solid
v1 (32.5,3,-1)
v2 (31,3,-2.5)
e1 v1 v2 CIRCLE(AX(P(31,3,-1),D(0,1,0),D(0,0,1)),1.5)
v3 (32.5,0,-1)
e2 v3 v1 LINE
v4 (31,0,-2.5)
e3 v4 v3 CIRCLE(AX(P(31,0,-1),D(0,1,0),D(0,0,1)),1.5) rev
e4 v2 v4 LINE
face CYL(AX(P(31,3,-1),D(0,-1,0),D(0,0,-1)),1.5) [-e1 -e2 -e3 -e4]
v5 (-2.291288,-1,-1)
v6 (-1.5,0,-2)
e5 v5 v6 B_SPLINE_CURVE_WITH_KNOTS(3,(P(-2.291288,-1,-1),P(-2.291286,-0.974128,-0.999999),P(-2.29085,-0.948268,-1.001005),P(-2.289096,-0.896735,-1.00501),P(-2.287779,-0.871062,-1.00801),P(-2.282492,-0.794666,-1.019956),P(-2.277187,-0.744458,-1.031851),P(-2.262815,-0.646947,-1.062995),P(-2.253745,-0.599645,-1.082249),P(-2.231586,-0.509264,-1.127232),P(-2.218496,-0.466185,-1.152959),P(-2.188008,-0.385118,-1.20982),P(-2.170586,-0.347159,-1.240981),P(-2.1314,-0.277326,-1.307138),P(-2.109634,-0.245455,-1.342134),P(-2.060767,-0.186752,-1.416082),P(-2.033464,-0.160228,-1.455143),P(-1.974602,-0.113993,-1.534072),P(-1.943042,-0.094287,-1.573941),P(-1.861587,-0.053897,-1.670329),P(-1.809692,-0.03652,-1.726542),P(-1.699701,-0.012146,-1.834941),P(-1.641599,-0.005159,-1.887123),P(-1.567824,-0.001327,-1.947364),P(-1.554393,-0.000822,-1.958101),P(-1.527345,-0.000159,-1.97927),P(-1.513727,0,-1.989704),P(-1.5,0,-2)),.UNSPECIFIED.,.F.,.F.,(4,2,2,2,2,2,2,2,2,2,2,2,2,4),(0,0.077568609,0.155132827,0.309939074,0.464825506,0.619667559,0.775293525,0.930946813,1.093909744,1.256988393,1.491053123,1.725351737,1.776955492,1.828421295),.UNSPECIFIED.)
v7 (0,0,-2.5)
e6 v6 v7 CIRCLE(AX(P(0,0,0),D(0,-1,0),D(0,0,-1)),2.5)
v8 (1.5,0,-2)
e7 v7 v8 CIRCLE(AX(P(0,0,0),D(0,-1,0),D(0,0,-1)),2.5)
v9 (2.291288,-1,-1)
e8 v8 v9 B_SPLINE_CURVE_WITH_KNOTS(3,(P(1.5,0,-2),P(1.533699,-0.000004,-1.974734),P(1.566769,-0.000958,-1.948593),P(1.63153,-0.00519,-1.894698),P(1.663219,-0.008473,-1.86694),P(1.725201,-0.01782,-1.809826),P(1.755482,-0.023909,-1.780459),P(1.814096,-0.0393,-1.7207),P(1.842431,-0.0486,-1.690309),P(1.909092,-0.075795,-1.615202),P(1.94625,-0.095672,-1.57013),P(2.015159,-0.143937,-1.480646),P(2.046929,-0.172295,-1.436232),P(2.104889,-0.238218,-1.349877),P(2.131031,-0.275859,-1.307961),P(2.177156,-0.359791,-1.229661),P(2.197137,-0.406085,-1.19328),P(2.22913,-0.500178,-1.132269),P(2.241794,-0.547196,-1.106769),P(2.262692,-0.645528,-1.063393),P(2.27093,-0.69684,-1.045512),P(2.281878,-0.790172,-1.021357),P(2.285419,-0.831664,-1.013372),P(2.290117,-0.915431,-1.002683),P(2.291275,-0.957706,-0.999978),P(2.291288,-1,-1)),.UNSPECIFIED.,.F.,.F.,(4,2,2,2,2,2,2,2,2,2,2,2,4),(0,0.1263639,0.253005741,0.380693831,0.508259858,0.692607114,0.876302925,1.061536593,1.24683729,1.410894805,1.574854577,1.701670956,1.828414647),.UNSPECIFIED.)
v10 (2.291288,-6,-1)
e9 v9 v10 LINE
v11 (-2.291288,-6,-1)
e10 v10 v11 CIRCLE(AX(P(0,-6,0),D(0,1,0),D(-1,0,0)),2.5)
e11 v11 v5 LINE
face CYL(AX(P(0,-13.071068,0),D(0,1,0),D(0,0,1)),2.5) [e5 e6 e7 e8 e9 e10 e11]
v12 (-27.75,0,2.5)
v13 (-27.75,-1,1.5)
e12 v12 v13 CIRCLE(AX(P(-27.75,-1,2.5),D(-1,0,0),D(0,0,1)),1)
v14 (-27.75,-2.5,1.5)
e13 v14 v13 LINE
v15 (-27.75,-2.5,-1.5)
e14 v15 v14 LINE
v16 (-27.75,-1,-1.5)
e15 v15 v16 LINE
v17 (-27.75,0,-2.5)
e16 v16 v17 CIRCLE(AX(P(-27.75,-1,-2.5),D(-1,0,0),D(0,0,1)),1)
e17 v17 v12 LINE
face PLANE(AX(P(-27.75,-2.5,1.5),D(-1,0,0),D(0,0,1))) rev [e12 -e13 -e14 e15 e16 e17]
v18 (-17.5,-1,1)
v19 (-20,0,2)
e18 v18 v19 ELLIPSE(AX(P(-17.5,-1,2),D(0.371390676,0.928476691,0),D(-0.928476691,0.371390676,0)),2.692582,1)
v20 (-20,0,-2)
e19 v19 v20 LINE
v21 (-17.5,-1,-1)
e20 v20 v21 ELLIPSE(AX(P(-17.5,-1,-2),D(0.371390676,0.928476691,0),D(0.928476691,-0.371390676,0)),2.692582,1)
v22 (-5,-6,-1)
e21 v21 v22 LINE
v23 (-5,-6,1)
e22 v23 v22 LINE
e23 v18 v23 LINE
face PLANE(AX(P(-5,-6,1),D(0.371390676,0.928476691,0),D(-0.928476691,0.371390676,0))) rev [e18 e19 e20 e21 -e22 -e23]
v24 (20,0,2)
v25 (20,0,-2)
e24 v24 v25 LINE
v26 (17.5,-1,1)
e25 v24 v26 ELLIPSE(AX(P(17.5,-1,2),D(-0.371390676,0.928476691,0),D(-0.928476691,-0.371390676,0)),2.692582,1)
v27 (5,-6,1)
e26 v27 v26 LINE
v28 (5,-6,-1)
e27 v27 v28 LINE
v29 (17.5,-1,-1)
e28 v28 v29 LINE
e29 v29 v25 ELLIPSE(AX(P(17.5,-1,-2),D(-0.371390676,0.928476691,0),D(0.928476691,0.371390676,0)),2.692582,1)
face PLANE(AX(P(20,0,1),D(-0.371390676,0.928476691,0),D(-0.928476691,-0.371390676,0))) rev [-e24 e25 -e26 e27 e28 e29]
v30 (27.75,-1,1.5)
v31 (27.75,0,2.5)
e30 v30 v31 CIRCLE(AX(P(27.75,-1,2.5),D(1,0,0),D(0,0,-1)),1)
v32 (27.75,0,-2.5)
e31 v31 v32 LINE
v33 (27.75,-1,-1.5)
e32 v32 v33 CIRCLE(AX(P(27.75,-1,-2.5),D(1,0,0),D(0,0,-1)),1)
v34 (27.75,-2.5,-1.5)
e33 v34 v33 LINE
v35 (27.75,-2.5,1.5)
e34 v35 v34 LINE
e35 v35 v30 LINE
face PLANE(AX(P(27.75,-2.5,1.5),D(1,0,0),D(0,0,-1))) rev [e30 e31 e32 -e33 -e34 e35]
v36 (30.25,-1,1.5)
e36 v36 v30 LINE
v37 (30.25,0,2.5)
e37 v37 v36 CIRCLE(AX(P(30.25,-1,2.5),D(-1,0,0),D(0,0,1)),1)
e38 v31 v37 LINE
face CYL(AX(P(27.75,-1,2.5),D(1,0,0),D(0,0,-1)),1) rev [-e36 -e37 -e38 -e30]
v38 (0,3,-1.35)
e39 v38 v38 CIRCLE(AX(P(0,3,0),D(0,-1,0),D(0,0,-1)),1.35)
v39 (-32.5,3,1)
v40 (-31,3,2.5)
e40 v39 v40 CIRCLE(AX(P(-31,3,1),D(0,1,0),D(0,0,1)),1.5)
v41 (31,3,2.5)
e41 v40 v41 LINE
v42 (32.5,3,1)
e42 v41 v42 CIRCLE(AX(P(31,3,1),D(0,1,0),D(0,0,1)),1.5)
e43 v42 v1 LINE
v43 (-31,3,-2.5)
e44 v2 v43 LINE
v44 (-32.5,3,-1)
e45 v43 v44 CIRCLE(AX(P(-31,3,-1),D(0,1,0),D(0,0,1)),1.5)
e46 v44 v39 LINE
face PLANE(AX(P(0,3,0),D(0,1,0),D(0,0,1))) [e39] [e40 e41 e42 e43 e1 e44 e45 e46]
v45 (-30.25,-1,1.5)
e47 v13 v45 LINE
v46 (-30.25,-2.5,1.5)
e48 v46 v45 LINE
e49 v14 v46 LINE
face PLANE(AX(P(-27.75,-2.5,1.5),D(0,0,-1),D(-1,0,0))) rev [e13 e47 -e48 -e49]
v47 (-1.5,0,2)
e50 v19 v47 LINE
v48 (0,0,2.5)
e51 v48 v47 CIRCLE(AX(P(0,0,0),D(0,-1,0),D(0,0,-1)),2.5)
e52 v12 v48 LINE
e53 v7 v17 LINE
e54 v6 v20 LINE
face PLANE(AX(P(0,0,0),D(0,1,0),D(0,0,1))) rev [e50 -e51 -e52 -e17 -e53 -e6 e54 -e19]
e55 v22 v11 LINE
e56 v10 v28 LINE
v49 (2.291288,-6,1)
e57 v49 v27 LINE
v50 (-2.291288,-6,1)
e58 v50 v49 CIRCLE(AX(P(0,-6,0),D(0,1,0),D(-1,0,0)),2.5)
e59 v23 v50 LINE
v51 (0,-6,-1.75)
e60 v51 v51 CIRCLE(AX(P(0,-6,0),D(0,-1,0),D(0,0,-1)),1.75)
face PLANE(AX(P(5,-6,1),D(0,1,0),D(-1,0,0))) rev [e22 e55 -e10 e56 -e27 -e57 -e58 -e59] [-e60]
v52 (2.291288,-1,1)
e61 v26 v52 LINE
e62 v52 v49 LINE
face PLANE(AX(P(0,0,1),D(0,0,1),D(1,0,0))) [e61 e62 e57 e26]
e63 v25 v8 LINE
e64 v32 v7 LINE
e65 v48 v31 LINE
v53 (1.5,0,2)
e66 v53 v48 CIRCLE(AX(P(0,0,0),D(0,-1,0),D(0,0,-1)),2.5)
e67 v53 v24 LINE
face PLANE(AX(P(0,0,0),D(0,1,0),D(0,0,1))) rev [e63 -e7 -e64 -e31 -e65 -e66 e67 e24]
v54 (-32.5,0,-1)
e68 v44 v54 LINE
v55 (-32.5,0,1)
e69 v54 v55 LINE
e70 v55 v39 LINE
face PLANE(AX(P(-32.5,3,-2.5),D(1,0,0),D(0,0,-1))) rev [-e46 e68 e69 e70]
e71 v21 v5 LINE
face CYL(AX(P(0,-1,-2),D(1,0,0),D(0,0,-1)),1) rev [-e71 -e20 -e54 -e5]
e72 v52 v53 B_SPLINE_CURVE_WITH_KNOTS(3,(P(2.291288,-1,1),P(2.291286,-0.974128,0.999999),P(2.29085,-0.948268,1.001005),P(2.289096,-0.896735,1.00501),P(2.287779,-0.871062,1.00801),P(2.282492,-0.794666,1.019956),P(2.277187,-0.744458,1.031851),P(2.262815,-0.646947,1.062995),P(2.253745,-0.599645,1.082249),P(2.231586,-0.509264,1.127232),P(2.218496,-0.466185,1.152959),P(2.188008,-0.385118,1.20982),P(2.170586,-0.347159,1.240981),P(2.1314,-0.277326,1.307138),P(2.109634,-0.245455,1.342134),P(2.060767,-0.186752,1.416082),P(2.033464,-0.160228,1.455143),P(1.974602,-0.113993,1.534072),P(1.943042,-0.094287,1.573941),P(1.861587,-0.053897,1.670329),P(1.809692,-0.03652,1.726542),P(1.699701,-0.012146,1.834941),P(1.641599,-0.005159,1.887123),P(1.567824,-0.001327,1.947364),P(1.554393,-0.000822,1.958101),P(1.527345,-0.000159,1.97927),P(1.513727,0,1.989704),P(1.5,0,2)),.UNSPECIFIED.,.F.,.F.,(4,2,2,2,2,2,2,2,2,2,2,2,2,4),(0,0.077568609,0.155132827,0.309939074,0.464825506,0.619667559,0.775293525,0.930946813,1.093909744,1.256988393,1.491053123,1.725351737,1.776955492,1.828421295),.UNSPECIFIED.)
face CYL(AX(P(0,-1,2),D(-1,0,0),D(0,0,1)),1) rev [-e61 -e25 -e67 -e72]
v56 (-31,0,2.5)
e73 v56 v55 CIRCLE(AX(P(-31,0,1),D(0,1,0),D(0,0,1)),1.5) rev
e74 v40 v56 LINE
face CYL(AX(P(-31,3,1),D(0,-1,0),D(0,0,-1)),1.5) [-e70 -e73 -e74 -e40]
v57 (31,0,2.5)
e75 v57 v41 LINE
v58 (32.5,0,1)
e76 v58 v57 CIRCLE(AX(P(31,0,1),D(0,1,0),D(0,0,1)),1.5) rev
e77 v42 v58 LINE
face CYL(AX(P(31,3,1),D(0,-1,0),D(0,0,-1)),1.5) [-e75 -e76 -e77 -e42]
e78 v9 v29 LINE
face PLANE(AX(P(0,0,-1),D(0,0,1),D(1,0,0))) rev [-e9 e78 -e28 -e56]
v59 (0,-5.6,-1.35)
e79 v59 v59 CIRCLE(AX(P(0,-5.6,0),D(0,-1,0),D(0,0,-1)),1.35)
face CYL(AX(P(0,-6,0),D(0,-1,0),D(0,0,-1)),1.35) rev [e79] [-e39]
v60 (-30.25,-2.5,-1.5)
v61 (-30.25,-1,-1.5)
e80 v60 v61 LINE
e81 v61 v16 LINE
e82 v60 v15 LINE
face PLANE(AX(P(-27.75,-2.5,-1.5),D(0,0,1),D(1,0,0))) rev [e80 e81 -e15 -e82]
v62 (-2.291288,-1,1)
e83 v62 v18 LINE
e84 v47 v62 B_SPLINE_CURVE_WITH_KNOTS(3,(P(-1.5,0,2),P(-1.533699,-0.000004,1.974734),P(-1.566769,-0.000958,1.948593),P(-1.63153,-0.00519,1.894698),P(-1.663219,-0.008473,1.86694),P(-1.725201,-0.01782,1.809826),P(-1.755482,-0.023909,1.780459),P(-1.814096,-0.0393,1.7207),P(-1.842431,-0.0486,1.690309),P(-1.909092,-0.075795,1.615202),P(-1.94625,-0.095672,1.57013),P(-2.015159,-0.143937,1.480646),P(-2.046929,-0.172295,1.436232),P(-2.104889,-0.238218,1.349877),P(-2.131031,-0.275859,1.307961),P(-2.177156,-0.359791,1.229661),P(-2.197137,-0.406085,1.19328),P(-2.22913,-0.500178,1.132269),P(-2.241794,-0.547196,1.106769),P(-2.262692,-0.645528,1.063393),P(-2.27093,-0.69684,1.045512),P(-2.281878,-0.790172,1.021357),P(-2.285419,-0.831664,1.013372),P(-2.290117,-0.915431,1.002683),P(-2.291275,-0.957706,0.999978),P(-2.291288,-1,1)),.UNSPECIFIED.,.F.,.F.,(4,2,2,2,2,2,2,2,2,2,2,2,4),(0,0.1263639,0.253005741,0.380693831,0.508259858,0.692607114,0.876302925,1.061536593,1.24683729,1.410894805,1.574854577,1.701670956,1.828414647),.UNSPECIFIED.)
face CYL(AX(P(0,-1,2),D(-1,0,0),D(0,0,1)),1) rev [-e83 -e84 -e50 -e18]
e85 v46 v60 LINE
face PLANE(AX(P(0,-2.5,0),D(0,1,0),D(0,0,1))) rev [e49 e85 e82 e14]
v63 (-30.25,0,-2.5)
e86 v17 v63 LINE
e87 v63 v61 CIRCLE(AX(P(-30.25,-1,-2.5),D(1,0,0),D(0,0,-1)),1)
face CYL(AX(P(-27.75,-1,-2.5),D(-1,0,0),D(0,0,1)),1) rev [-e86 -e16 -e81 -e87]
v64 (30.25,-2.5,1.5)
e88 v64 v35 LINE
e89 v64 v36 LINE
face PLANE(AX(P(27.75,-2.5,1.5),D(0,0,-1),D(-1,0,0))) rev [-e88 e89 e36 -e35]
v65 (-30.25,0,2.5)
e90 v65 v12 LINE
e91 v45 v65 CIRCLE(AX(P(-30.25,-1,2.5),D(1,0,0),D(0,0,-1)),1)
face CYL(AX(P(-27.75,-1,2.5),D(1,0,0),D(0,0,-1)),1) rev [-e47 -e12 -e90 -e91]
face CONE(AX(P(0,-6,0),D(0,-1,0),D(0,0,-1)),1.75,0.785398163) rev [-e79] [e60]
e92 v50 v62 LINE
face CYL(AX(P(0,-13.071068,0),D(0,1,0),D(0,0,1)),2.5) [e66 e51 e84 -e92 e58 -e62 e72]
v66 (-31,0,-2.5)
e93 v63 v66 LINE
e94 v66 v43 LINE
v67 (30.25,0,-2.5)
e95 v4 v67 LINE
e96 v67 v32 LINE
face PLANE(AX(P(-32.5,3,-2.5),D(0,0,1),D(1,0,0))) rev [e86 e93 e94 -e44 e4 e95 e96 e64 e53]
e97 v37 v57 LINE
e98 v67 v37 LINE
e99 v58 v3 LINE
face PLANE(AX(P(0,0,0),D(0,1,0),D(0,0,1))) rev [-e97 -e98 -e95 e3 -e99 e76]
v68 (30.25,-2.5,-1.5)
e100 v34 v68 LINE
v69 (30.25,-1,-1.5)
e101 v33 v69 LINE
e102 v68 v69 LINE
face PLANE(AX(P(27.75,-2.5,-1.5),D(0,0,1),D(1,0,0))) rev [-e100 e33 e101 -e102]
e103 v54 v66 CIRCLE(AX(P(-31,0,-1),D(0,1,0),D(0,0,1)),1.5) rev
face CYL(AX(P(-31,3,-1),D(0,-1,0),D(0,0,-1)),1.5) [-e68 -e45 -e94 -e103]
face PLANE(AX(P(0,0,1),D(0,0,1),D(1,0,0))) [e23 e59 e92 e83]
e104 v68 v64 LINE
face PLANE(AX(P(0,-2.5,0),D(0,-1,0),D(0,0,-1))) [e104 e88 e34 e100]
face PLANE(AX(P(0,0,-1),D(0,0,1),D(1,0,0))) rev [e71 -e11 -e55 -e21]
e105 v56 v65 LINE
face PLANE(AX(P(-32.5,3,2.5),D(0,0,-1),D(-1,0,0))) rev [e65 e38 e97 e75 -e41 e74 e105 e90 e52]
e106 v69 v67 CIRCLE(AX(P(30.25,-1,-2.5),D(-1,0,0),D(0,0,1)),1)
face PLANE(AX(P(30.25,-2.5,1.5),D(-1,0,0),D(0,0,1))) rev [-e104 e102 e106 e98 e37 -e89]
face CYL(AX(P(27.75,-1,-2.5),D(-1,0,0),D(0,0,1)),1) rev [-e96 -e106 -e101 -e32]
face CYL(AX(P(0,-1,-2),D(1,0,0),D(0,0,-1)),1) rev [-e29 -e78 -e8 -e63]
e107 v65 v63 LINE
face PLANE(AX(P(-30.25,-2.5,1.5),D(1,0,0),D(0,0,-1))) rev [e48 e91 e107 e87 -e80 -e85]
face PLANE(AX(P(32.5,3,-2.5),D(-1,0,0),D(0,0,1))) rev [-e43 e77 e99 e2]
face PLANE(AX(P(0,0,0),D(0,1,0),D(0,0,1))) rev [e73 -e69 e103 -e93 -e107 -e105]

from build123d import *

# Parameters (mm, degrees)
SKETCH1_W                        = 65
SKETCH1_H                        = 5
BODY_DEPTH                       = 3
SKETCH3_W                        = 2.5
SKETCH3_H                        = 3
PEGS_DEPTH                       = 2.5
WEB_DEPTH                        = 1
SKETCH6_R                        = 2.5
HOLE_BOSS_DEPTH                  = 6
M2_5_CLEARANCE_HOLE1_D           = 2.7
M2_5_CLEARANCE_HOLE1_CSINK_D     = 3.5
M2_5_CLEARANCE_HOLE1_CSINK_ANGLE = 90
FILLET1_R                        = 1.5
FILLET2_R                        = 1
FILLET3_R                        = 1


with BuildPart() as part:
    # Sketch1 → body (new body)
    with BuildSketch(Plane(origin=(0, 0, 0), x_dir=(1, 0, 0), z_dir=(0, 1, 0))):
        Rectangle(SKETCH1_W, SKETCH1_H)
    extrude(amount=BODY_DEPTH)

    # Sketch3 → pegs (add)
    with BuildSketch(Plane.XZ):
        with Locations((29, 0)):
            Rectangle(SKETCH3_W, SKETCH3_H)
        with Locations((-29, 0)):
            Rectangle(SKETCH3_W, SKETCH3_H)
    extrude(amount=PEGS_DEPTH)

    # Sketch5 → web (add, symmetric)
    with BuildSketch(Plane.XY):
        Polygon((-20, 0), (20, 0), (5, -6), (-5, -6), align=None)
    extrude(amount=WEB_DEPTH, both=True)

    # Sketch6 → hole-boss (add)
    with BuildSketch(Plane.XZ):
        Circle(SKETCH6_R)
    extrude(amount=HOLE_BOSS_DEPTH)

    # M2.5 Clearance Hole1 (through all)
    with Locations(Plane(origin=(0, -6, 0), x_dir=(-1, 0, 0), z_dir=(0, -1, 0))):
        with Locations((0, 0)):
            CounterSinkHole(M2_5_CLEARANCE_HOLE1_D / 2, M2_5_CLEARANCE_HOLE1_CSINK_D / 2, counter_sink_angle=M2_5_CLEARANCE_HOLE1_CSINK_ANGLE)

    # Fillet1
    fillet1_edges = [part.edges().sort_by_distance(p)[0] for p in [
        (32.5, 1.5, 2.5),
        (-32.5, 1.5, 2.5),
        (-32.5, 1.5, -2.5),
        (32.5, 1.5, -2.5),
    ]]
    fillet(fillet1_edges, radius=FILLET1_R)

    # Fillet2
    fillet2_edges = [part.edges().sort_by_distance(p)[0] for p in [
        (29, 0, 1.5),
        (29, 0, -1.5),
        (-29, 0, 1.5),
        (-29, 0, -1.5),
    ]]
    fillet(fillet2_edges, radius=FILLET2_R - 0.0001)  # a hair under: the kernel refuses the full size

    # Fillet3
    fillet3_edges = [part.edges().sort_by_distance(p)[0] for p in [
        (11.145643924, 0, -1),
        (11.145643924, 0, 1),
        (-11.145643924, 0, -1),
        (-11.145643924, 0, 1),
    ]]
    fillet(fillet3_edges, radius=FILLET3_R)


solid = part.part
